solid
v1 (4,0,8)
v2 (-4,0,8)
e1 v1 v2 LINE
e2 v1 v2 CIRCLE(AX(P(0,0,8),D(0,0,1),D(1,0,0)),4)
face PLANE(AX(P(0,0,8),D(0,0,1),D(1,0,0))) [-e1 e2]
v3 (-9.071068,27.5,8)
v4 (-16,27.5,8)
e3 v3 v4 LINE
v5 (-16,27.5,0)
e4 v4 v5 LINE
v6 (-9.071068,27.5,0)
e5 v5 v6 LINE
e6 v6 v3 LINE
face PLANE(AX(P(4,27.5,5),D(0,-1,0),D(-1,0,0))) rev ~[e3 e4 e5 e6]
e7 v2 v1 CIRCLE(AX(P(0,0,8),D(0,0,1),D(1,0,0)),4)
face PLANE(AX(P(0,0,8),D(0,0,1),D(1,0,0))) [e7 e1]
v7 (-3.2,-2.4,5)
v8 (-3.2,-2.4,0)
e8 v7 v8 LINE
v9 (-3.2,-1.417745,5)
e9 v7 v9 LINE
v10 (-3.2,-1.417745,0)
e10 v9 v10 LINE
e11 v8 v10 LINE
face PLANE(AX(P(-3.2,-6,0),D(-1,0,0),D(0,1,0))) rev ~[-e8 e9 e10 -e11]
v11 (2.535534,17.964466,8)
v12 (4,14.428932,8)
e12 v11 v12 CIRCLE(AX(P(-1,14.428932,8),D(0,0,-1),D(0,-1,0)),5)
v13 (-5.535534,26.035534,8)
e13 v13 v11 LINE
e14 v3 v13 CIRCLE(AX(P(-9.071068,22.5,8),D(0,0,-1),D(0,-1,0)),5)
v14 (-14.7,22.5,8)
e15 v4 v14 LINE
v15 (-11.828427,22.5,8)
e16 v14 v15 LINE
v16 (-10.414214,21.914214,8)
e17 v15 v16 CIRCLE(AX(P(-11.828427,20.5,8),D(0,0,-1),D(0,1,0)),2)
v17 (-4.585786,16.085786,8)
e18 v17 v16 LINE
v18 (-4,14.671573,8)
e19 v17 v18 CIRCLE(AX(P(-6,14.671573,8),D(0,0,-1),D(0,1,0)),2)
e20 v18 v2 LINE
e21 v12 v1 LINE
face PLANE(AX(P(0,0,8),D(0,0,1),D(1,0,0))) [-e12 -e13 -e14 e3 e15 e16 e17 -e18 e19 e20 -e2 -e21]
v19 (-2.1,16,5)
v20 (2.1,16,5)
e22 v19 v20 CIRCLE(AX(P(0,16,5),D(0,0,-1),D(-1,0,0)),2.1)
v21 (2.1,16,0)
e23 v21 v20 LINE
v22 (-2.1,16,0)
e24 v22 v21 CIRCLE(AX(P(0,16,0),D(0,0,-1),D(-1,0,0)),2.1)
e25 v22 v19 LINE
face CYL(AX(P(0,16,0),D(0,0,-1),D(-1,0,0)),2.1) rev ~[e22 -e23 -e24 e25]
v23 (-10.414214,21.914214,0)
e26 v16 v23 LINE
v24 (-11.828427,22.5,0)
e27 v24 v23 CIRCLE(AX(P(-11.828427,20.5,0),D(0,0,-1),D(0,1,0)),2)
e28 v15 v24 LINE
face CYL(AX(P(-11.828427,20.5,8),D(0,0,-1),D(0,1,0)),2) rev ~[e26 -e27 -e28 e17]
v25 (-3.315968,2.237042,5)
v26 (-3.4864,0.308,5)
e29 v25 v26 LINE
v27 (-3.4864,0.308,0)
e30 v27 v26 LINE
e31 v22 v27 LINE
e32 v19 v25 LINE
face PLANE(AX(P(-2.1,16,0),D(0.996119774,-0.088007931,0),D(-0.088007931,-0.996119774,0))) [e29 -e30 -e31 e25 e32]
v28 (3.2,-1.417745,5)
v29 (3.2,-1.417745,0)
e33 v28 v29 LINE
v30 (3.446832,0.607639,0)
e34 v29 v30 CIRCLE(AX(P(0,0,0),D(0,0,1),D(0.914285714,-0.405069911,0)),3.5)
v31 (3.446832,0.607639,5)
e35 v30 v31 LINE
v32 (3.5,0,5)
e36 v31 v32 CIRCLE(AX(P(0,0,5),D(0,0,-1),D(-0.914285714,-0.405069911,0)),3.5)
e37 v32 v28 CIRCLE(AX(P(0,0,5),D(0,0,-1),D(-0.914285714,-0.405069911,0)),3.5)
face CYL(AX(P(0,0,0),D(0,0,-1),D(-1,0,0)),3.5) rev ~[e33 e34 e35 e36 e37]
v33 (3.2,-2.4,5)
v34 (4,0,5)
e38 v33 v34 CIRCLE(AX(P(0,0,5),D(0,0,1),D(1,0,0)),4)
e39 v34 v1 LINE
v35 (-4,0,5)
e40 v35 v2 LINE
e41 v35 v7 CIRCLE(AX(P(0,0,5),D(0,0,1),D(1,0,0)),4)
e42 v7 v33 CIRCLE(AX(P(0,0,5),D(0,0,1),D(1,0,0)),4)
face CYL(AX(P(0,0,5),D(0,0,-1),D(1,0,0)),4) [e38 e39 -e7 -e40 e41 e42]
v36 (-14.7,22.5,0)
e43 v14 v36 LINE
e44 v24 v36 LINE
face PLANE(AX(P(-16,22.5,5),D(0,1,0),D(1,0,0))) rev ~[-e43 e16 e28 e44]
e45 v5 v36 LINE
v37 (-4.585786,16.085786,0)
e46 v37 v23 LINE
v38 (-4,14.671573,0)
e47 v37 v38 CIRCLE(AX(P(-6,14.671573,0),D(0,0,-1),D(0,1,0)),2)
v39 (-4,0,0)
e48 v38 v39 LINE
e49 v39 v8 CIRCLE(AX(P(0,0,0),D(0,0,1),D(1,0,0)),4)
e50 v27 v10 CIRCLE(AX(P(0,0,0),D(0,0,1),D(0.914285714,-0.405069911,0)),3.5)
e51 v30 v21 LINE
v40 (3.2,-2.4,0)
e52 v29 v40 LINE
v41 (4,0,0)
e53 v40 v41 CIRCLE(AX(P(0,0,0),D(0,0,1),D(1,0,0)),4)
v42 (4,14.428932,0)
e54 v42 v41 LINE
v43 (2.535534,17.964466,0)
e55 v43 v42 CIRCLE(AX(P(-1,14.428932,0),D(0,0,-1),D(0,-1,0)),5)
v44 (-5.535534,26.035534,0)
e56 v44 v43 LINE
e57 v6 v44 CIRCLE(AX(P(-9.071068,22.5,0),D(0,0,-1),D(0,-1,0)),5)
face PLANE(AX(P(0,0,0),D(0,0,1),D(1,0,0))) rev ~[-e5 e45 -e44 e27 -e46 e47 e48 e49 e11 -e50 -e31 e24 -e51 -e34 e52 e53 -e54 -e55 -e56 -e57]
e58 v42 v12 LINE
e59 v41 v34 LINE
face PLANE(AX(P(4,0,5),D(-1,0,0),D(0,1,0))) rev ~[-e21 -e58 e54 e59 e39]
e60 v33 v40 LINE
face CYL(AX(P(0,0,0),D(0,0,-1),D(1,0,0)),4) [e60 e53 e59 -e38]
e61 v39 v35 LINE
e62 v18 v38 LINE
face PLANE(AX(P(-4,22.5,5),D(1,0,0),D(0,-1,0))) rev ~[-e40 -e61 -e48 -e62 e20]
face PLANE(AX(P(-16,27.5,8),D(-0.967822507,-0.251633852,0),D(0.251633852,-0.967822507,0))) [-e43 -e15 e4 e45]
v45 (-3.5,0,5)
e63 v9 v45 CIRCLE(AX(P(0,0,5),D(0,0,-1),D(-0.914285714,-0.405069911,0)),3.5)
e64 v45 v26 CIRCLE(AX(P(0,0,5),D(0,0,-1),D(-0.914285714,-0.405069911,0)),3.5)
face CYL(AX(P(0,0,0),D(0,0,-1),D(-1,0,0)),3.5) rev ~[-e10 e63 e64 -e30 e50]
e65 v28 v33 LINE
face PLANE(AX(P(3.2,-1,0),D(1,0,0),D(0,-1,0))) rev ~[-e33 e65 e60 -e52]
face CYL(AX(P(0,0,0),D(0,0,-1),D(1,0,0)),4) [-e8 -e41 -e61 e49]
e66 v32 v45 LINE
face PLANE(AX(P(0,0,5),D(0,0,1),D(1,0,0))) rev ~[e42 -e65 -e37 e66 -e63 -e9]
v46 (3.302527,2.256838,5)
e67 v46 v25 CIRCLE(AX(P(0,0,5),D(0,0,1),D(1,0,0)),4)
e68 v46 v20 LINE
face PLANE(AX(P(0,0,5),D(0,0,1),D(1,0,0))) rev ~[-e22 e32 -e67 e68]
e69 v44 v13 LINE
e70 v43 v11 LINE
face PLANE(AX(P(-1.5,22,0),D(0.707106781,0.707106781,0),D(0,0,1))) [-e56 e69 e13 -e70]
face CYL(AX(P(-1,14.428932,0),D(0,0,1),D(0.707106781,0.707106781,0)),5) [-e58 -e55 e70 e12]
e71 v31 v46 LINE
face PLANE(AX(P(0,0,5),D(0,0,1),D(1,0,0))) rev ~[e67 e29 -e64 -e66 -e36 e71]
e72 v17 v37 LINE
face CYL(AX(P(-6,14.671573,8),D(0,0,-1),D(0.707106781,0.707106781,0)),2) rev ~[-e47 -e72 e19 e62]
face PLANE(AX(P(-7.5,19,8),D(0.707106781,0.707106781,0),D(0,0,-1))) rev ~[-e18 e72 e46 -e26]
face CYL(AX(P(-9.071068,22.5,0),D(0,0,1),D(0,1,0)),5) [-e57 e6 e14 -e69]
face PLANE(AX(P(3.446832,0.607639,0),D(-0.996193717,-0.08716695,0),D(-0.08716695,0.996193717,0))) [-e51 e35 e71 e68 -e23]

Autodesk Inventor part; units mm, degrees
ref_plane "YZ Plane" through (0, 0, 0) normal (1, 0, 0) x (0, 1, 0)
ref_plane "XZ Plane" through (0, 0, 0) normal (0, 1, 0) x (-1, 0, 0)
ref_plane "XY Plane" through (0, 0, 0) normal (0, 0, 1) x (1, 0, 0)
sketch "Sketch2" plane through (0, 0, 0) normal (0, 0, 1) x (1, 0, 0)
  circle A0 centre (0, 0) radius 4
  line L0 (-4, 0) -> (4, 0)
  line L1 (4, 0) -> (4, 25)
  line L2 (4, 25) -> (-4, 25)
  line L3 (-4, 25) -> (-4, 0)
  point P0 (4, 0)
  dimension "d11" = 8
  dimension "d12" = 8
  dimension "d13" = 25
extrude "Extrusion2" add sketch "Sketch2" along normal blind 5
sketch "Sketch3" plane through (0, 0, 5) normal (0, 0, 1) x (1, 0, 0)
  line L0 (4, 0) -> (4, 25) projected
  line L1 (-16, 27.5) -> (4, 27.5)
  line L2 (4, 27.5) -> (4, 22.5)
  line L3 (4, 22.5) -> (-16, 22.5)
  line L4 (-16, 22.5) -> (-16, 27.5)
  line L5 (4, 25) -> (-4, 25) projected
  point P0 (0, 0)
  point P1 (3, 25)
  dimension "d16" = 2.5
  dimension "d17" = 2.5
  dimension "d18" = 20
extrude "Extrusion3" add sketch "Sketch3" against normal blind 5
sketch "Sketch4" plane through (0, 0, 5) normal (0, 0, 1) x (1, 0, 0)
  line L0 (4, 0) -> (4, 27.5) projected
  line L1 (-16, 22.5) -> (-16, 27.5) projected
  line L2 (4, 27.5) -> (-16, 27.5)
  line L3 (-16, 27.5) -> (-16, 22.5)
  line L4 (-16, 22.5) -> (4, 22.5)
  line L5 (4, 22.5) -> (4, 27.5)
  point P0 (0, 0)
extrude "Extrusion4" add sketch "Sketch4" along normal blind 3
sketch "Sketch6" plane through (0, 0, 0) normal (0, 0, -1) x (-1, 0, 0)
  circle A0 centre (0, 0) radius 3.5
  dimension "d30" = 7
extrude "Extrusion6" cut sketch "Sketch6" against normal blind 5
sketch "Sketch7" plane through (0, 0, 0) normal (0, 0, -1) x (-1, 0, 0)
  line L0 (-3.2, -6) -> (3.2, -6)
  line L1 (3.2, -6) -> (3.2, -1)
  line L2 (3.2, -1) -> (-3.2, -1)
  line L3 (-3.2, -1) -> (-3.2, -6)
  line L4 (-4, 0) -> (-4, 27.5) projected
  line L5 (4, 22.5) -> (4, 0) projected
  point P0 (0, 0)
  point P1 (-4, 24.5)
  dimension "d33" = 1
  dimension "d34" = 6
  dimension "d35" = 0.8
  dimension "d36" = 0.8
extrude "Extrusion7" cut sketch "Sketch7" against normal blind 5
sketch "Sketch8" plane through (0, 0, 0) normal (0, 0, -1) x (-1, 0, 0)
  circle A0 centre (0, 16) radius 2.1
  arc A1 (3.2, -1.4177) -> (-3.2, -1.4177) centre (0, 0) ccw projected
  line L0 (-3.5, 0) -> (-2.1, 16)
  line L1 (2.1, 16) -> (3.4864, 0.308)
  point P0 (-3.4468, 0.6078)
  dimension "d39" = 16
  dimension "d40" = 4.2
extrude "Extrusion8" cut sketch "Sketch8" against normal blind 5 contours A0 | L1 A1 L0 A0
sketch "Sketch10" plane through (0, 0, 5) normal (0, 0, 1) x (1, 0, 0)
  line L0 (-4, 22.5) -> (-4, 0) projected
  line L1 (4, 0) -> (4, 22.5) projected
  line L2 (-4, 22.5) -> (4, 22.5)
  line L3 (4, 22.5) -> (4, 0)
  line L4 (4, 0) -> (-4, 0)
  line L5 (-4, 0) -> (-4, 22.5)
  point P0 (0, 0)
  point P1 (-4, 15.5)
  point P2 (-4, 15.5)
  point P3 (-4, 14.5)
extrude "Extrusion10" add sketch "Sketch10" along normal blind 3
chamfer "Chamfer5" distance 7 angle 45 1 edges at (-4, 22.5, 4)
chamfer "Chamfer6" distance 11 angle 45 1 edges at (4, 27.5, 4)
fillet "Fillet6" radius 5 2 edges at (-7, 27.5, 4) (4, 16.5, 4)
fillet "Fillet7" radius 2 2 edges at (-11, 22.5, 4) (-4, 15.5, 4)
sketch "Sketch14" plane through (0, 0, 5) normal (0, 0, 1) x (1, 0, 0)
  circle A0 centre (0, 0) radius 4
extrude "Extrusion14" add sketch "Sketch14" along normal blind 3
sketch "Sketch15" plane through (0, 0, 8) normal (0, 0, 1) x (1, 0, 0)
  line L0 (-16, 22.5) -> (-16, 27.5) projected
  line L1 (-16, 27.5) -> (-16, 22.5)
  line L2 (-16, 22.5) -> (-14.7, 22.5)
  line L3 (-11.8284, 22.5) -> (-16, 22.5) projected
  line L4 (-16, 27.5) -> (-14.7, 22.5)
  point P0 (0, 0)
  dimension "d82" = 1.3
extrude "Extrusion15" cut sketch "Sketch15" against normal blind 20
properties part number "switch-pusher"
